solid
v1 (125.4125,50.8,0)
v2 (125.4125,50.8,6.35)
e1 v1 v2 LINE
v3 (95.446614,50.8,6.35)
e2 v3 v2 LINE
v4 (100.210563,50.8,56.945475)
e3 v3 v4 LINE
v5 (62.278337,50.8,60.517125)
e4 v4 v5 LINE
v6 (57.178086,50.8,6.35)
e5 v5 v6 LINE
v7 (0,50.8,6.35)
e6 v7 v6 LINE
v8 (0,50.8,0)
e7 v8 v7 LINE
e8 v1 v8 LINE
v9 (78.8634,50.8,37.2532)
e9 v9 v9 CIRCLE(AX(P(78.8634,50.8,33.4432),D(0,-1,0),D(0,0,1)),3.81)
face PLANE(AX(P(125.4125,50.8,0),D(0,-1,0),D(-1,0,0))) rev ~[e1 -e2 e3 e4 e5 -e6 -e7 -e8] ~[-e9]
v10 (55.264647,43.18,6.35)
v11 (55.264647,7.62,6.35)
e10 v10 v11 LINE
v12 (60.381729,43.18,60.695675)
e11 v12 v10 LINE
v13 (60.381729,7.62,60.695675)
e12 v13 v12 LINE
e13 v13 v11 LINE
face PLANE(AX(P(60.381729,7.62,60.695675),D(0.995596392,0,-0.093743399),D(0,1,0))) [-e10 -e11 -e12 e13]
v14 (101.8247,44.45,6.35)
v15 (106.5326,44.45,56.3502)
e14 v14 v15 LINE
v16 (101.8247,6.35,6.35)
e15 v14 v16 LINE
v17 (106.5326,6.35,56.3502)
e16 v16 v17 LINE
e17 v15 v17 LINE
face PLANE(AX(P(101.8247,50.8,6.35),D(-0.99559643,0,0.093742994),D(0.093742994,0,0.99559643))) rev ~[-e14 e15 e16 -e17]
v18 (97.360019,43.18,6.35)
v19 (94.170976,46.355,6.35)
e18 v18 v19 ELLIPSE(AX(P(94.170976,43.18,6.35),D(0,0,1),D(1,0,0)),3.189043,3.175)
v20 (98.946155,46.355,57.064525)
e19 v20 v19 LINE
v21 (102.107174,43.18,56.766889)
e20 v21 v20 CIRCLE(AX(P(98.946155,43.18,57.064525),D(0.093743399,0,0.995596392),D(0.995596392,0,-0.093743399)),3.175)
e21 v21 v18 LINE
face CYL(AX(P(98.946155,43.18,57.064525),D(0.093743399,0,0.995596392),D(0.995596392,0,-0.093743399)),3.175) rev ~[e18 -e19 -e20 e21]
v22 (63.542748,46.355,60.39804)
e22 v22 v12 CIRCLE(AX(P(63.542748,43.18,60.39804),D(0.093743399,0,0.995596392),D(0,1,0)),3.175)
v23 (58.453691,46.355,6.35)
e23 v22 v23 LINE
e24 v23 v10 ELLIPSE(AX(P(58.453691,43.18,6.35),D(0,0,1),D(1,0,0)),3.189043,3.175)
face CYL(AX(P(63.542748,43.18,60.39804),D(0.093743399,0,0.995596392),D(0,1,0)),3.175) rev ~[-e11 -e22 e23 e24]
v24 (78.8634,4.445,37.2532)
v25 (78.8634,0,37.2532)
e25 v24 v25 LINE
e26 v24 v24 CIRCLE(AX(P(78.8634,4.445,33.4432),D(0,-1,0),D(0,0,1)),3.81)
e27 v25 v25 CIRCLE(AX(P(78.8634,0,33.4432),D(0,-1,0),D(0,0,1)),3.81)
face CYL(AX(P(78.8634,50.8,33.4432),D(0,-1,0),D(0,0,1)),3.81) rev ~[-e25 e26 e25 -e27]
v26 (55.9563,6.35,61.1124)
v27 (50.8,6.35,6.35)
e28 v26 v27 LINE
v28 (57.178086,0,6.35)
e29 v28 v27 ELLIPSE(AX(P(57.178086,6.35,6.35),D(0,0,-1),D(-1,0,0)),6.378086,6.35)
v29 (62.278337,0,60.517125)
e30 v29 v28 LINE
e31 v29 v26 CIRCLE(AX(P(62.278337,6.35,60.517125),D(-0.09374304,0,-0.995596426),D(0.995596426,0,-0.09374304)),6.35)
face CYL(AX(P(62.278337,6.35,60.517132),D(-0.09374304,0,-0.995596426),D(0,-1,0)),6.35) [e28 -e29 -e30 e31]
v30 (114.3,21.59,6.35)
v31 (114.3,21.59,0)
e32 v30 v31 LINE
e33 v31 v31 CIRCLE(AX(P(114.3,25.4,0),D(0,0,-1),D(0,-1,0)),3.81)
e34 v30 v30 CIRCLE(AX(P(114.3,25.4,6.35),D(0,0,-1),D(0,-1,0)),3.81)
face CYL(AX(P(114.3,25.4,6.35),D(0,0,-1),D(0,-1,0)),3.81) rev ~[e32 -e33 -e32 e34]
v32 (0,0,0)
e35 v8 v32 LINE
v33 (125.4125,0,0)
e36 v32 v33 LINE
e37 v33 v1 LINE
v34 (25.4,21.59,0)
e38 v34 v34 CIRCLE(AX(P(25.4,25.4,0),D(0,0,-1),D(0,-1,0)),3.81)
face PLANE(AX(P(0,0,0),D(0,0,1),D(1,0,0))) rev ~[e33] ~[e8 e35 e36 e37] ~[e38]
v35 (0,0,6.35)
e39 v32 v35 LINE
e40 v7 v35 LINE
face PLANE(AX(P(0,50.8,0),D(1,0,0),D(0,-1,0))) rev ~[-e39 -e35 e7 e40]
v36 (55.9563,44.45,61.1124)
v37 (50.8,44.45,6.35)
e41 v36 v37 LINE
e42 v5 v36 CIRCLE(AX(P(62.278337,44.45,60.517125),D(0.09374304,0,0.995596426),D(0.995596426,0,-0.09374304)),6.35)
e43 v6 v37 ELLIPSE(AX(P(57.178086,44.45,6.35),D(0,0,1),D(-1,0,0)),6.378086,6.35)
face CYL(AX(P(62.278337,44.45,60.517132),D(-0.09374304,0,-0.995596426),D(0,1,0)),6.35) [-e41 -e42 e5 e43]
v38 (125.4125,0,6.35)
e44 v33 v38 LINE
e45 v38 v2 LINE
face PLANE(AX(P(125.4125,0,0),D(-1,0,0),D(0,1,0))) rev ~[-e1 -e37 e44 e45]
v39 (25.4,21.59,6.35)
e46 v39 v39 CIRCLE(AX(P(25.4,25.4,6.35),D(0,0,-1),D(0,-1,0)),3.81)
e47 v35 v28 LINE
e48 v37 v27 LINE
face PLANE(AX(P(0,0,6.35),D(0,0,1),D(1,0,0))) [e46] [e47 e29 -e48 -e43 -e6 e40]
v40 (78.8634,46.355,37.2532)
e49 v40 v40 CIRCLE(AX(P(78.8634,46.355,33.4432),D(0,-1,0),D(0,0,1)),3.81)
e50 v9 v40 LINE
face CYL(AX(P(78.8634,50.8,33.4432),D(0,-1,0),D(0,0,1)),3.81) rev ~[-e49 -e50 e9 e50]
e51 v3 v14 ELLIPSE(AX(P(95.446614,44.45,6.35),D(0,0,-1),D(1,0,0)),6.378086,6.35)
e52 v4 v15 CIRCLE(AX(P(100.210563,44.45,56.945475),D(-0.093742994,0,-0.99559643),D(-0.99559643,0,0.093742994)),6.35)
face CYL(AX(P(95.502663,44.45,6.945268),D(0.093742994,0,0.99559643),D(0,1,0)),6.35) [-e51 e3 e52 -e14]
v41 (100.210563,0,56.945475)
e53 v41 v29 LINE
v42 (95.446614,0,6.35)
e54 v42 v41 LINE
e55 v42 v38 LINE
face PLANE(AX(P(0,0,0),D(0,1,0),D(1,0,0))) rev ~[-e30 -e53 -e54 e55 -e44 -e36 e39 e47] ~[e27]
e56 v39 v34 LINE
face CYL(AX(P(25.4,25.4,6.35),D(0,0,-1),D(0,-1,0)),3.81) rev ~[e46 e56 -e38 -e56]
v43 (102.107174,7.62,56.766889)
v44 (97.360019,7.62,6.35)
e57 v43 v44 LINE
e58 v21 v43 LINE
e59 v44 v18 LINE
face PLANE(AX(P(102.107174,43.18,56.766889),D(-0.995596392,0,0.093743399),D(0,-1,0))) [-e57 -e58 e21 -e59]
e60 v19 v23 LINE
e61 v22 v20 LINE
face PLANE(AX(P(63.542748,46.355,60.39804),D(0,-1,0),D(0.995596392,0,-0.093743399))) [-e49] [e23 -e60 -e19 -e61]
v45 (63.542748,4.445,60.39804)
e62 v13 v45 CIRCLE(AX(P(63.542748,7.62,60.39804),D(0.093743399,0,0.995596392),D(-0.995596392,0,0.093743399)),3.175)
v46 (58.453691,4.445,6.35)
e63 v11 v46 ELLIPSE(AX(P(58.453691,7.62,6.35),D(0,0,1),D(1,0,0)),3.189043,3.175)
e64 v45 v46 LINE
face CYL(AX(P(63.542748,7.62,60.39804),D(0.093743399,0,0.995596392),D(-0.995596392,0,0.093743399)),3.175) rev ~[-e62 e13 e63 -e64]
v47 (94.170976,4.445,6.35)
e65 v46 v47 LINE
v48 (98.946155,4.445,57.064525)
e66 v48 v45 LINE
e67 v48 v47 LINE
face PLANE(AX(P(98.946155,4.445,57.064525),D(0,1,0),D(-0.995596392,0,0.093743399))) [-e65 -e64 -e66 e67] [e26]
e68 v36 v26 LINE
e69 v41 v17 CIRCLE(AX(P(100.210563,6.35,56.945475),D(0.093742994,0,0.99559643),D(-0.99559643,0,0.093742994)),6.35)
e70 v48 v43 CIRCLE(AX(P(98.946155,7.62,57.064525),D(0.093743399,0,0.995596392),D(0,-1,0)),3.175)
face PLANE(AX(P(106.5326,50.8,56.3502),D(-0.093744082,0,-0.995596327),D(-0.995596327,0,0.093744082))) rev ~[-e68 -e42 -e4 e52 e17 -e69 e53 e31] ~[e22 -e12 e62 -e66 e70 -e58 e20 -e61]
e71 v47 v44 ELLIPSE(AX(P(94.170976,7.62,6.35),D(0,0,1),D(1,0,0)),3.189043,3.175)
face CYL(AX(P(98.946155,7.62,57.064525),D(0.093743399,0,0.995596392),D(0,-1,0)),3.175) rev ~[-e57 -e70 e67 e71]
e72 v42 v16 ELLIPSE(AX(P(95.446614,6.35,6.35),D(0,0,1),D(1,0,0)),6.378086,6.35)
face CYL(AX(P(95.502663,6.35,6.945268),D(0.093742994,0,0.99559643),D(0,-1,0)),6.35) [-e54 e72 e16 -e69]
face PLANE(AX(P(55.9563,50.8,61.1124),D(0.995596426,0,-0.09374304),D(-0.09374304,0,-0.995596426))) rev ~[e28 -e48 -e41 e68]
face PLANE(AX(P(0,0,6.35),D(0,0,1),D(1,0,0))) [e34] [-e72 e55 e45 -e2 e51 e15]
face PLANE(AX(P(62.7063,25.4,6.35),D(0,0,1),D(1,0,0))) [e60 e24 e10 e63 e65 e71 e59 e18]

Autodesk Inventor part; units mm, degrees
ref_plane "YZ Plane" through (0, 0, 0) normal (1, 0, 0) x (0, 1, 0)
ref_plane "XZ Plane" through (0, 0, 0) normal (0, 1, 0) x (-1, 0, 0)
ref_plane "XY Plane" through (0, 0, 0) normal (0, 0, 1) x (1, 0, 0)
sketch "Sketch1" plane through (0, 0, 0) normal (0, 0, 1) x (1, 0, 0)
  line L0 (0, 0) -> (125.4125, 0)
  line L1 (125.4125, 0) -> (125.4125, 50.8)
  line L2 (125.4125, 50.8) -> (0, 50.8)
  line L3 (0, 50.8) -> (0, 0)
  dimension "d0" = 50.8
  dimension "d1" = 125.4125
extrude "Extrusion1" add sketch "Sketch1" along normal blind 6.35
sketch "Sketch2" plane through (0, 0, 6.35) normal (0, 0, 1) x (1, 0, 0)
  line L0 (0, 0) -> (0, 50.8) projected
  line L1 (125.4125, 50.8) -> (125.4125, 0) projected
  point P0 (25.4, 25.4)
  point P1 (114.3, 25.4)
  point P2 (0, 25.4)
  dimension "d4" = 25.4
  dimension "d5" = 11.1125
hole "Hole1" at (25.4, 25.4, 6.35) at (114.3, 25.4, 6.35) direction (0, 0, -1) diameter 7.62 end through all
sketch "Sketch3" plane through (0, 50.8, 0) normal (0, 1, 0) x (1, 0, 0)
  line L0 (0, -6.35) -> (125.4125, -6.35) projected
  line L1 (0, 0) -> (0, -6.35) projected
  line L2 (101.8247, -6.35) -> (106.5326, -56.3502)
  line L3 (106.5326, -56.3502) -> (55.9563, -61.1124)
  line L4 (55.9563, -61.1124) -> (50.8, -6.35)
  dimension "d13" = 50.8
  dimension "d14" = 50.8
  dimension "d15" = 54.7624
  dimension "d16" = 5.379
extrude "Extrusion2" add sketch "Sketch3" against normal up to surface (50.8 mm away)
sketch "Sketch4" plane through (106.5326, 0, 56.3502) normal (0.0937434, 0, 0.9955964) x (0.9955964, 0, -0.0937434)
  line L0 (-50.8, 50.8) -> (0, 50.8) projected
  line L1 (-50.8, 50.8) -> (-50.8, 0) projected
  line L2 (-43.18, 46.355) -> (-7.62, 46.355)
  line L3 (-4.445, 43.18) -> (-4.445, 7.62)
  line L4 (-7.62, 4.445) -> (-43.18, 4.445)
  line L5 (-46.355, 7.62) -> (-46.355, 43.18)
  arc A0 (-43.18, 46.355) -> (-46.355, 43.18) centre (-43.18, 43.18) ccw
  arc A1 (-46.355, 7.62) -> (-43.18, 4.445) centre (-43.18, 7.62) ccw
  arc A2 (-7.62, 4.445) -> (-4.445, 7.62) centre (-7.62, 7.62) ccw
  arc A3 (-4.445, 43.18) -> (-7.62, 46.355) centre (-7.62, 43.18) ccw
  point P0 (-100.781, 0)
  point P1 (-25.4, 46.355)
  point P2 (-25.4, 50.8)
  point P3 (-46.355, 25.4)
  point P4 (-50.8, 25.4)
  dimension "d19" = 3.175
  dimension "d20" = 4.445
  dimension "d21" = 4.445
extrude "Extrusion3" cut sketch "Sketch4" against normal up to surface surface through (62.7063, 25.4, 6.35) normal (0, 0, 1)
fillet "Fillet1" radius 6.35 4 edges at (53.3782, 50.8, 33.7312) (53.3782, 0, 33.7312) (104.1787, 50.8, 31.3501) (104.1787, 0, 31.3501)
hole "Hole2" at (78.8634, 50.8, 33.4432) direction (0, -1, 0) diameter 7.62 end through all
properties part number "frame bracket" material "Steel"
